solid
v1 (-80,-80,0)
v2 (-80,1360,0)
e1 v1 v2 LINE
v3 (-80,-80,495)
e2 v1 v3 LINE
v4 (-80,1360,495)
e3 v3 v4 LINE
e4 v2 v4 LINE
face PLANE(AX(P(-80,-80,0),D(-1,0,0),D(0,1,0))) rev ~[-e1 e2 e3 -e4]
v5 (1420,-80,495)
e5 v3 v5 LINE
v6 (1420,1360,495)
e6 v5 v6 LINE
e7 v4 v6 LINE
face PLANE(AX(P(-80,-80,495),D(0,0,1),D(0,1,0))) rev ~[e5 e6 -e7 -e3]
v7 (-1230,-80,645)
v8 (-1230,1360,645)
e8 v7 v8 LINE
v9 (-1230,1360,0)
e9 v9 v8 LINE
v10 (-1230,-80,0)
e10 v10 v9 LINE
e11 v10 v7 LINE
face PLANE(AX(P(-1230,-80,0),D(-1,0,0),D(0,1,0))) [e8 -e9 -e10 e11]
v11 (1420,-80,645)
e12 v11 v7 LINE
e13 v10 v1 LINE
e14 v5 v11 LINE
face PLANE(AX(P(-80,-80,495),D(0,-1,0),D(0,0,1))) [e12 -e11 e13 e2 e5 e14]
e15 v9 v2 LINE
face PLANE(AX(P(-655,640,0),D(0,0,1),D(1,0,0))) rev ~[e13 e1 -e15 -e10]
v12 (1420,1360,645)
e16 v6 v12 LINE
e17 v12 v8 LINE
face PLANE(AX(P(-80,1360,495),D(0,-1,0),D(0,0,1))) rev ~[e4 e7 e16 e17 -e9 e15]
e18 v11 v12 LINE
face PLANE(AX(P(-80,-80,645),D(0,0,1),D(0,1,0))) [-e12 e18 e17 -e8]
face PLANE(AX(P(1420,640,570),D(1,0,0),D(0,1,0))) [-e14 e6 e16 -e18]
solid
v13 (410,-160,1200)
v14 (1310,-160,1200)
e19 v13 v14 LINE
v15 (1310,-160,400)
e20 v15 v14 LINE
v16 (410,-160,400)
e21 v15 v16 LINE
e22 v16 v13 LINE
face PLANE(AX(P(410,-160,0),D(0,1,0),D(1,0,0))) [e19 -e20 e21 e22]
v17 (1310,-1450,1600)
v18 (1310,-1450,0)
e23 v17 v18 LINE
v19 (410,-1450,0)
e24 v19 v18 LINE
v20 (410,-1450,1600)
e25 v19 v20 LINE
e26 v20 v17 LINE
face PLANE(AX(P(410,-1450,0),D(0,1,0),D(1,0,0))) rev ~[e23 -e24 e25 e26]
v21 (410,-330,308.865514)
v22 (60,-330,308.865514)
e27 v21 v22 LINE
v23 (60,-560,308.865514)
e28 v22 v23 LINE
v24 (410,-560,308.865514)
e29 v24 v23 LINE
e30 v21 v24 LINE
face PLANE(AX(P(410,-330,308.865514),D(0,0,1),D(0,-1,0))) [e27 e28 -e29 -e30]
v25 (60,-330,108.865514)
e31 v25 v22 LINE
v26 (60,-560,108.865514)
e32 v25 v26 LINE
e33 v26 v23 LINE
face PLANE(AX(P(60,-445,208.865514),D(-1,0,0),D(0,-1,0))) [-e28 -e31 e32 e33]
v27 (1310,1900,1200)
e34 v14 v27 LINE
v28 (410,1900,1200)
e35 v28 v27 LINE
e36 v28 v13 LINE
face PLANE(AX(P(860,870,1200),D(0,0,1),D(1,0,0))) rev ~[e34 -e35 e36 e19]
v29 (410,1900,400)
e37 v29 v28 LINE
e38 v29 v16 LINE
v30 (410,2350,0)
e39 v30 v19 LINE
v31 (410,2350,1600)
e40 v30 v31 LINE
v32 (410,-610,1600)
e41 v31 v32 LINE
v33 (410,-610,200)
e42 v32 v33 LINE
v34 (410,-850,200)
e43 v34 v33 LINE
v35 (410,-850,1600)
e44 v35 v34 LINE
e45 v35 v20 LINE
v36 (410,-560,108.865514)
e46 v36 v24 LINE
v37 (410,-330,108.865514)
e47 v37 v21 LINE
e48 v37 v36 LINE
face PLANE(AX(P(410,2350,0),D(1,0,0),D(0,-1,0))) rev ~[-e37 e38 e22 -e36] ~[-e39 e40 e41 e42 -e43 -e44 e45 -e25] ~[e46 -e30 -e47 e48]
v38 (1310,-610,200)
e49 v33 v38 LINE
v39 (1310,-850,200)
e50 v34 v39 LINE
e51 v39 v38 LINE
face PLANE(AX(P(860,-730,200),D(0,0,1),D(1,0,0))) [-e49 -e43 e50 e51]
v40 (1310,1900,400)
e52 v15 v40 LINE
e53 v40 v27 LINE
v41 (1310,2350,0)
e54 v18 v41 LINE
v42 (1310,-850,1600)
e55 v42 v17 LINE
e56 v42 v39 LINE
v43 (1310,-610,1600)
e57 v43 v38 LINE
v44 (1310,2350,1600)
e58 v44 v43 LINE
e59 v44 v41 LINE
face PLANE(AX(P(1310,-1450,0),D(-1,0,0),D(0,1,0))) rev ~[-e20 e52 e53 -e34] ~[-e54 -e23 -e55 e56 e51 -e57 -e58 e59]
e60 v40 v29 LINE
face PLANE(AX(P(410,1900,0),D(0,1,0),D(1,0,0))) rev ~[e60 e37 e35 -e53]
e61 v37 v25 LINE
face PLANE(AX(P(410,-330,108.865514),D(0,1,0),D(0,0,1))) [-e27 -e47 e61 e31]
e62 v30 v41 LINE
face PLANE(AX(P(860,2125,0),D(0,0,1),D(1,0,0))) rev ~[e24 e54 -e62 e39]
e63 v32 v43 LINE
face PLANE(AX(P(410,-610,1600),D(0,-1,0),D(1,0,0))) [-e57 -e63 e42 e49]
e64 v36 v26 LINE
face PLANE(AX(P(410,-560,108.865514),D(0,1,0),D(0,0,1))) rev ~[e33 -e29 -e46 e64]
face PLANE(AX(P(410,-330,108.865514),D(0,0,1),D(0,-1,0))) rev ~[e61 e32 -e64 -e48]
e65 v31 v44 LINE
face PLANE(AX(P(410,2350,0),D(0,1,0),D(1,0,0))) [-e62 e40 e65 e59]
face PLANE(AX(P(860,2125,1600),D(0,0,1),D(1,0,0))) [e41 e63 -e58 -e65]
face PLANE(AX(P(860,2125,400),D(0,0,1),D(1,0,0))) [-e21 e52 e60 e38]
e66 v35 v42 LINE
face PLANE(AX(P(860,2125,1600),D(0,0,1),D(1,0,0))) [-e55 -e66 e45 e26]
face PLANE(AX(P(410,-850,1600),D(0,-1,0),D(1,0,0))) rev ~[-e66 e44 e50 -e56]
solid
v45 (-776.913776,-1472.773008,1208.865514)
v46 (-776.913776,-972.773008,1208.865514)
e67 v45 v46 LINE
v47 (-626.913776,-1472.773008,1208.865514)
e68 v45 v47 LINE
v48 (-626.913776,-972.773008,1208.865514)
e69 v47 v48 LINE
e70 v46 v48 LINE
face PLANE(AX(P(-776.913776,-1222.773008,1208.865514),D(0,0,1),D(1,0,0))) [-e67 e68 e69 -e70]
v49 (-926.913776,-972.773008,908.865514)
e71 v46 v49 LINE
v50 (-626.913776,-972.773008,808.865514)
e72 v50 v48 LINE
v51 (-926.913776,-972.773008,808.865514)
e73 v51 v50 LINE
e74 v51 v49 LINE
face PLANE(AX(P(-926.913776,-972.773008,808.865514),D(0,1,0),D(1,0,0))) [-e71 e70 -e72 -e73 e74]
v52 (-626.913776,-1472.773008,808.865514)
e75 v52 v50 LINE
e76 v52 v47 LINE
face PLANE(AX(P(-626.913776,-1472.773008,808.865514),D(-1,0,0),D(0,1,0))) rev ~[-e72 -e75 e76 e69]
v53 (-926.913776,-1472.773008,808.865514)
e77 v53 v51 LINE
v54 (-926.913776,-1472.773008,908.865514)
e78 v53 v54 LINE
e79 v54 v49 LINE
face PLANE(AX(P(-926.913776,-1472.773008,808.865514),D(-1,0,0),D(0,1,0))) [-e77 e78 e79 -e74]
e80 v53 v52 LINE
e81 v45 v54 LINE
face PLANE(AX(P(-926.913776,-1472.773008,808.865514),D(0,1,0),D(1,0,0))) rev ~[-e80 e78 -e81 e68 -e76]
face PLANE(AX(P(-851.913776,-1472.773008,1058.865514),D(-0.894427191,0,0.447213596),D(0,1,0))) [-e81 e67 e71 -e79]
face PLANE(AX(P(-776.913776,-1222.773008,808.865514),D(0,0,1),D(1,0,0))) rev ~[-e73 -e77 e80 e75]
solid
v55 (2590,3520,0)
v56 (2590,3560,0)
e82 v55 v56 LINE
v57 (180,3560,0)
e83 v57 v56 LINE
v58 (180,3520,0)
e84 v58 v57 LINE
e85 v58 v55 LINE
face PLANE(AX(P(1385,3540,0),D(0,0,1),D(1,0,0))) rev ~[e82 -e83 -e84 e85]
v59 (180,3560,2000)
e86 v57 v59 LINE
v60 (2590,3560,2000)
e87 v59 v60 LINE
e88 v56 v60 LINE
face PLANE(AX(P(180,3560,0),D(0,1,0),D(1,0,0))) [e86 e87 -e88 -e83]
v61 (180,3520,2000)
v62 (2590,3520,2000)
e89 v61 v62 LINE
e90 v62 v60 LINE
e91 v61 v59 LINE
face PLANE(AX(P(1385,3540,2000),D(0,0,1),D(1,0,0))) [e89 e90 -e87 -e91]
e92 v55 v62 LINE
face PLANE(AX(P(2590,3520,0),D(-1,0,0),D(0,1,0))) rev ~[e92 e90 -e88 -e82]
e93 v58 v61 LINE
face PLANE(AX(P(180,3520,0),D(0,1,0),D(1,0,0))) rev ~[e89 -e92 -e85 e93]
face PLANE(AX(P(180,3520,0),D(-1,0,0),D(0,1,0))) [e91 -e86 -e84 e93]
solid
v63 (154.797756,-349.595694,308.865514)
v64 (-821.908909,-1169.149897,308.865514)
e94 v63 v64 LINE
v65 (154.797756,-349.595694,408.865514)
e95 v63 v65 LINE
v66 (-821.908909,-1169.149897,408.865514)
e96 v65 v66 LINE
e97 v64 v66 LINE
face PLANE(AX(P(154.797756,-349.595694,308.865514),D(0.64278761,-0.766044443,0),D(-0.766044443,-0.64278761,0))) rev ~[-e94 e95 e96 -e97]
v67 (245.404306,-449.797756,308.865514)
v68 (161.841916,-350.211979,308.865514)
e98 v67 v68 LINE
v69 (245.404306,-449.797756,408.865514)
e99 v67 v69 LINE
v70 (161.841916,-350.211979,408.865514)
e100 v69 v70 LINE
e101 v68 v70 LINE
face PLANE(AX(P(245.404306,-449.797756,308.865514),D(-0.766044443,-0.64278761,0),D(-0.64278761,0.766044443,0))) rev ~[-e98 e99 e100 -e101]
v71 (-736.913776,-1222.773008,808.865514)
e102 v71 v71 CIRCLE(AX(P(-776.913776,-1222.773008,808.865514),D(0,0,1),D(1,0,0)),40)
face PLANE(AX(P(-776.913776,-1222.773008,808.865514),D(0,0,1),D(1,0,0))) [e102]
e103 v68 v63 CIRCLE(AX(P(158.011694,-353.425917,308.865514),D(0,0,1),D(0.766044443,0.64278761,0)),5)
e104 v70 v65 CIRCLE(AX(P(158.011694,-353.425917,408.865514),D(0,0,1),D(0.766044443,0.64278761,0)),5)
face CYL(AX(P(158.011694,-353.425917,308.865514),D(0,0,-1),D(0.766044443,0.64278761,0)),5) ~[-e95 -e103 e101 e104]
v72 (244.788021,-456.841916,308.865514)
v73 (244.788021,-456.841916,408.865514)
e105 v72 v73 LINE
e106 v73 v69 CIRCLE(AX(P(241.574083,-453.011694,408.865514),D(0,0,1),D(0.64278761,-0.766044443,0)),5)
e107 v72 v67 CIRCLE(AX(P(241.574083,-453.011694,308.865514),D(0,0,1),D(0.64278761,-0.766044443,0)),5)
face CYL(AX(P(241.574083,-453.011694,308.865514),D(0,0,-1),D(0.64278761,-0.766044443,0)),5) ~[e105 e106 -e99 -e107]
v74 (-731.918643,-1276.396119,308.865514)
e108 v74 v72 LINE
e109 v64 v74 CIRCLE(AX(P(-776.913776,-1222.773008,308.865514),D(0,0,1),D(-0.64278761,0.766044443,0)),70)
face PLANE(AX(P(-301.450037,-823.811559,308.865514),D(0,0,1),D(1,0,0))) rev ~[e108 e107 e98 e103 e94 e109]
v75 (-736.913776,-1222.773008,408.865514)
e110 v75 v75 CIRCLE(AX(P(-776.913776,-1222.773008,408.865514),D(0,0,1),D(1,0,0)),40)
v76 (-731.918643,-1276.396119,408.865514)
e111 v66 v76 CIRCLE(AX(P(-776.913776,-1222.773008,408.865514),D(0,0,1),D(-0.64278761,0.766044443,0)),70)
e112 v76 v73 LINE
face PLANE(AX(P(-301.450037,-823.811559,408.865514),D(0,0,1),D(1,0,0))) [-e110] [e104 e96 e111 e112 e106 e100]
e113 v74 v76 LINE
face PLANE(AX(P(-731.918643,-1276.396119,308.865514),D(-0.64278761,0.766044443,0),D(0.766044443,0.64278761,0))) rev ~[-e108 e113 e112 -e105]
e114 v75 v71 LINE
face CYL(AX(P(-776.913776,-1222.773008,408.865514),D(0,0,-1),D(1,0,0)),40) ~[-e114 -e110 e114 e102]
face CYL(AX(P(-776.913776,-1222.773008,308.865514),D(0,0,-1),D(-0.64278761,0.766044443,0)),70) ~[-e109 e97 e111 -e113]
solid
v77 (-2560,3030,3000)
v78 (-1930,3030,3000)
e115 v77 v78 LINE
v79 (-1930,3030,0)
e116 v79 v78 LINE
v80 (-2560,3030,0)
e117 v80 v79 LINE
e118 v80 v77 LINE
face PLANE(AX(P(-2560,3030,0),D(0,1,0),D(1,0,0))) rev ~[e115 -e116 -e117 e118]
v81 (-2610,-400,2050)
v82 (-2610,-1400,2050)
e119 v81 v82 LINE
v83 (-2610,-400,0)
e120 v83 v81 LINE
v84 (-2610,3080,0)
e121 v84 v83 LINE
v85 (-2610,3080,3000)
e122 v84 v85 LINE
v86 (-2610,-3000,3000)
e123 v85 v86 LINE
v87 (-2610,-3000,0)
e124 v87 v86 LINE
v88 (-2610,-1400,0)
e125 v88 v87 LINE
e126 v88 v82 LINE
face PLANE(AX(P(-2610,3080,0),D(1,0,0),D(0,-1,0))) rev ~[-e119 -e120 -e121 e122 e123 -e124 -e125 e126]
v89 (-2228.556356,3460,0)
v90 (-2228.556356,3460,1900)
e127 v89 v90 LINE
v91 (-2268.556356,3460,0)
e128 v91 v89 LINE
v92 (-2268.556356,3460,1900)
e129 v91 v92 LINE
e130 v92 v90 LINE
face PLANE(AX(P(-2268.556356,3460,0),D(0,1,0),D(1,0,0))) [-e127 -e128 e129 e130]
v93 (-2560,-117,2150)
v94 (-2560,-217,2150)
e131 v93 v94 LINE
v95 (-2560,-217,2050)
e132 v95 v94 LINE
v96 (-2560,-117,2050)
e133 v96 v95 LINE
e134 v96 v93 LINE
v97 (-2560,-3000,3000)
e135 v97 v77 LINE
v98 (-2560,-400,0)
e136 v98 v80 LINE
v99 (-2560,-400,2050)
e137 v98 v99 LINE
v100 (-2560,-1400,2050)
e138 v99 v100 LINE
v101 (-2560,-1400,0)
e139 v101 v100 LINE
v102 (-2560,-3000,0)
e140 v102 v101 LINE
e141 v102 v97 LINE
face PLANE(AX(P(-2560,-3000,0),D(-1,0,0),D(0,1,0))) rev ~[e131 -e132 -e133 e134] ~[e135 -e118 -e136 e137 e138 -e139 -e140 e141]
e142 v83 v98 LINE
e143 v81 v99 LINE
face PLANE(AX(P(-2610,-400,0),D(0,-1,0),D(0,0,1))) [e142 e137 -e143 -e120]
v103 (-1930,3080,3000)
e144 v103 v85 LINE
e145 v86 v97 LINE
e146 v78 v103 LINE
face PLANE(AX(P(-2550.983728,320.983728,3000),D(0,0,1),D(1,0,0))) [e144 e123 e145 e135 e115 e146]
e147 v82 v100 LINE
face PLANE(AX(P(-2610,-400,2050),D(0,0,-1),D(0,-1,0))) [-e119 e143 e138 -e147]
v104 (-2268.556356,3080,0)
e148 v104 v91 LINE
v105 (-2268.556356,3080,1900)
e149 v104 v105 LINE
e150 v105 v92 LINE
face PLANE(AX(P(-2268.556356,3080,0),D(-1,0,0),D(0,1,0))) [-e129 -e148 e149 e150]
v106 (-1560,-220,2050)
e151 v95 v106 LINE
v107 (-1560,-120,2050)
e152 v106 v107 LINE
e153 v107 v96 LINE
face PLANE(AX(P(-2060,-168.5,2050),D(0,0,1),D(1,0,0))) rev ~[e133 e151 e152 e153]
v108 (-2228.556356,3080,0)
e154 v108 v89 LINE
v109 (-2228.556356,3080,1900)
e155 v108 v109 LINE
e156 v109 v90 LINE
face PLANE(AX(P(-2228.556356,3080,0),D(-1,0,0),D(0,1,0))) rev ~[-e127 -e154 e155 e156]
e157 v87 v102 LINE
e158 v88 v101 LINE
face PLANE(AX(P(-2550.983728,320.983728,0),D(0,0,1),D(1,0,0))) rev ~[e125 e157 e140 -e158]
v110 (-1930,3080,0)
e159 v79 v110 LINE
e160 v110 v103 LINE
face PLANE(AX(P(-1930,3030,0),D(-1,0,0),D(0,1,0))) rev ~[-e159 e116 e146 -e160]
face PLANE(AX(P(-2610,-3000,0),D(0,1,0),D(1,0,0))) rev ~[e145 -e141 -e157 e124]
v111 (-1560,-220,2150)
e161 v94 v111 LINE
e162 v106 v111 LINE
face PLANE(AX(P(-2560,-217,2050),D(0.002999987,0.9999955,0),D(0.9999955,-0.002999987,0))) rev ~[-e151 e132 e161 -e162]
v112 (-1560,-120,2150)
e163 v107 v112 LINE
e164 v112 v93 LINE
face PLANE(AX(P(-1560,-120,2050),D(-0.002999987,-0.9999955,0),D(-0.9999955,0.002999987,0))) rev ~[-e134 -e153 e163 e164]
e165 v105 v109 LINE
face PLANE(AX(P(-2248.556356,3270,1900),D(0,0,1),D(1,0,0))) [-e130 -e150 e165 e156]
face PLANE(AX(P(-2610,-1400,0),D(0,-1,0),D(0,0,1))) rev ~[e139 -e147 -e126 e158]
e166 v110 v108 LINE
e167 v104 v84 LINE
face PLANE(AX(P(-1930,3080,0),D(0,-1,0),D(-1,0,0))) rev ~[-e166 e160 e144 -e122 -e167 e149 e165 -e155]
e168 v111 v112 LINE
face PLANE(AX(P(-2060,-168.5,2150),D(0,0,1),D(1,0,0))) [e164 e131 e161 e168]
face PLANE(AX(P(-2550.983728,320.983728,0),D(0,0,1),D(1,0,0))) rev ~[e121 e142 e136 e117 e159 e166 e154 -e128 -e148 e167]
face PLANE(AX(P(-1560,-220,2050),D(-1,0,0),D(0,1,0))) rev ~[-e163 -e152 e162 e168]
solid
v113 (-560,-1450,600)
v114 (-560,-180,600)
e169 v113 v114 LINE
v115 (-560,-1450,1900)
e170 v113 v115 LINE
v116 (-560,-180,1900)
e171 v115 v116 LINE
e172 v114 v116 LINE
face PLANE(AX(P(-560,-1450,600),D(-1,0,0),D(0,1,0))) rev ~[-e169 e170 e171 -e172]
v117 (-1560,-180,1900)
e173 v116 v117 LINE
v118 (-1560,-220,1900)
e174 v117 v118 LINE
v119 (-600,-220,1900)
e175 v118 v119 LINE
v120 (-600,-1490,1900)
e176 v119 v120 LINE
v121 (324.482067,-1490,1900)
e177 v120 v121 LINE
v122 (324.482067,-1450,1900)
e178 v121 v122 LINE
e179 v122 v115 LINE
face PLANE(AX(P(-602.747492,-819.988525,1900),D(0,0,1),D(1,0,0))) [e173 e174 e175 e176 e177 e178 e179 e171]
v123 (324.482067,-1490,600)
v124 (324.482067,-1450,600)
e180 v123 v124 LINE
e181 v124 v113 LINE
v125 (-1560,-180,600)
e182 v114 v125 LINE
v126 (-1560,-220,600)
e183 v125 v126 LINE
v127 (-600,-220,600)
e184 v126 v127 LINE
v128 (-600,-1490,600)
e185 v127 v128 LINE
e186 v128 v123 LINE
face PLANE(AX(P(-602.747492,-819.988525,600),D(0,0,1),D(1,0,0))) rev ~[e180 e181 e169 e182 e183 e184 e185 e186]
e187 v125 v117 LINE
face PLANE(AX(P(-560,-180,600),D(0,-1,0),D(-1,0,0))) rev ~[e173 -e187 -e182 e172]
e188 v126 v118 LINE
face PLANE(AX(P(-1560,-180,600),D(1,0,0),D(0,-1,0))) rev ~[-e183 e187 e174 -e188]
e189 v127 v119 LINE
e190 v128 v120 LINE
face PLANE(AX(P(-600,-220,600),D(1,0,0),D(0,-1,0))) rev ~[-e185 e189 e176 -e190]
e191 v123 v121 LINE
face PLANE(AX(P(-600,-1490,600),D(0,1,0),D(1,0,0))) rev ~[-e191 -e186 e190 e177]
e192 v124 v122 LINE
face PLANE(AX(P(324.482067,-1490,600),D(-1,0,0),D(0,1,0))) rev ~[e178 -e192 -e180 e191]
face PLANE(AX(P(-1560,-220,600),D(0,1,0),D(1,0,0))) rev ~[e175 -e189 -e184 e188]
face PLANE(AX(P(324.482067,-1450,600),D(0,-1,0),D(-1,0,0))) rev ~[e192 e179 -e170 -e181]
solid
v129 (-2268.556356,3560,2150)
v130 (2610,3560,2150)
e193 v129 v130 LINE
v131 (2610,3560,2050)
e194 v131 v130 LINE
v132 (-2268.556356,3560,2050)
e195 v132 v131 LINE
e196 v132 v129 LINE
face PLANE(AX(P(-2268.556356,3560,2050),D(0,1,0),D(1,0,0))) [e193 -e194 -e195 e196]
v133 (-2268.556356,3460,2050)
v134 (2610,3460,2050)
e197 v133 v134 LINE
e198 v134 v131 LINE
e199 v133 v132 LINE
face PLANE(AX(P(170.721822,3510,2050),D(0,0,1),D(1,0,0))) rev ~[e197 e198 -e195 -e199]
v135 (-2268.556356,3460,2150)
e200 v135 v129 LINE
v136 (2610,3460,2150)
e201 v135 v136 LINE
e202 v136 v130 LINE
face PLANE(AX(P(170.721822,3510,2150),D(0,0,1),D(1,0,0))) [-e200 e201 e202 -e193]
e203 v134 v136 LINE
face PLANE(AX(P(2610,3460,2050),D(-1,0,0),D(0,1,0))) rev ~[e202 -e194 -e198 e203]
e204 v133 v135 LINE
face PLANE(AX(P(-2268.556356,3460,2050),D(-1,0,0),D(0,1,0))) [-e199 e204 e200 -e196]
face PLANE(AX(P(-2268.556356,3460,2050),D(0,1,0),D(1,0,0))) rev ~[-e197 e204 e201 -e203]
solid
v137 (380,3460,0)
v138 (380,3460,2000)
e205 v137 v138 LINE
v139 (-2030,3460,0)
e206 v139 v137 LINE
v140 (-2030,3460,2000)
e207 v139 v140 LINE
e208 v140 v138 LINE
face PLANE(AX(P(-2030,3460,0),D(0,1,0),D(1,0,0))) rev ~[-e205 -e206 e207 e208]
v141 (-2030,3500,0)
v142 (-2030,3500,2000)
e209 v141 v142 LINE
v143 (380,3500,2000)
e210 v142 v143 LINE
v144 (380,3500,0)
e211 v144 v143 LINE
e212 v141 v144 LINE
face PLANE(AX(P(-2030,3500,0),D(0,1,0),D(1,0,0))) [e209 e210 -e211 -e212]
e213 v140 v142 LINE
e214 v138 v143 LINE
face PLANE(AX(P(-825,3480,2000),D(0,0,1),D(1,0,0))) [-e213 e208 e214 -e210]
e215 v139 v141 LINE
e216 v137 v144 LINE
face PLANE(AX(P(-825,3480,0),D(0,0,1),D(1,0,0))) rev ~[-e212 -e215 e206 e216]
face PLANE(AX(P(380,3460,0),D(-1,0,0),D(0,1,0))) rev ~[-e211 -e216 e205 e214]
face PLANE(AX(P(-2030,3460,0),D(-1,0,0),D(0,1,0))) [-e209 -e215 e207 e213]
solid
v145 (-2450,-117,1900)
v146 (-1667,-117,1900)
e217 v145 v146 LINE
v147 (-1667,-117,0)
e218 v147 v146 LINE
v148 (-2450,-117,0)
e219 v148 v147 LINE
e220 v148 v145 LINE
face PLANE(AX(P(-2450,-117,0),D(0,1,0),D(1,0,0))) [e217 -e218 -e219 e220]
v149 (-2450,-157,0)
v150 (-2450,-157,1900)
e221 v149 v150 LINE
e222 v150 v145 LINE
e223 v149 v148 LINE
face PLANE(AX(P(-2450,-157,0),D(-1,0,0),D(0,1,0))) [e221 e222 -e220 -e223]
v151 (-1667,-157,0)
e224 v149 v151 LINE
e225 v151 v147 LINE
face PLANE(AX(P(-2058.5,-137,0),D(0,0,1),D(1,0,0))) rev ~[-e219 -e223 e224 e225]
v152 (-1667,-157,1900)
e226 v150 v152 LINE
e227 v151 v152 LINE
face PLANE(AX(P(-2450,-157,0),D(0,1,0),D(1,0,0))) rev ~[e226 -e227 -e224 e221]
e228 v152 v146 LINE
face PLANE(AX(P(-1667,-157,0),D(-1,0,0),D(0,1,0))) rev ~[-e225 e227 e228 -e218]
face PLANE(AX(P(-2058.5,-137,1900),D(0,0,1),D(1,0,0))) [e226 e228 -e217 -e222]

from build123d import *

# Parameters (mm, degrees)
F1_DEPTH  = 3000
F0_W      = 1150
F0_H      = 1440
F2_DEPTH  = 645
F0_W_2    = 900
F0_H_2    = 450
F0_W_3    = 660
F0_H_3    = 1290
F3_DEPTH  = 400
F4_DEPTH  = 1600
F5_W      = 900
F5_H      = 2960
F5_H_2    = 240
F5_H_3    = 600
F6_DEPTH  = 400
F7_W      = 1440
F7_H      = 150
F8_DEPTH  = 1500
F9_DEPTH  = 1400
F10_W     = 1000
F10_H     = 2050
F11_DEPTH = 50
F12_W     = 230
F12_H     = 200
F13_DEPTH = 350
F15_DEPTH = 100
F16_R     = 40
F17_DEPTH = 400
F18_W     = 300
F18_H     = 500
F19_DEPTH = 400
F20_SIZE2 = 300
F20_SIZE  = 150
F23_DEPTH = 1300
F24_W     = 2410
F24_H     = 40
F26_DEPTH = 2000
F29_DEPTH = 100
F28_W     = 4878.5563564301
F28_H     = 100
F24_W_2   = 40
F24_H_2   = 380
F30_DEPTH = 1900
F24_W_3   = 783


# Not quite as in the source:
# - the program builds the solid bodies; features that only make, move or delete a surface that nothing else refers to are left out


with BuildPart() as f1:
    # F0 (on Top) → F1 (new body)
    with BuildSketch(Plane.XY):
        Polygon((-2610, -3000), (-2560, -3000), (-2560, 3030), (-1930, 3030), (-1930, 3080), (-2610, 3080), (-2610, 3030), align=None)
    extrude(amount=F1_DEPTH)

    # F10 (on face) → F11 (cut, through all)
    with BuildSketch(Plane(origin=(-2610, 0, 0), x_dir=(0, -1, 0), z_dir=(-1, 0, 0))):
        with Locations((900, 1025)):
            Rectangle(F10_W, F10_H)
    extrude(amount=-F11_DEPTH, mode=Mode.SUBTRACT)

    # F28 (on offset) → F29 (join)
    with BuildSketch(Plane.XY.offset(2050)):
        Polygon((-1560, -220), (-1560, -120), (-2560, -117), (-2560, -217), align=None)
    extrude(amount=F29_DEPTH)

    # F24 (on Top) → F30 (join)
    with BuildSketch(Plane.XY):
        with Locations((-2248.5563564301, 3270)):
            Rectangle(F24_W_2, F24_H_2)
    extrude(amount=F30_DEPTH)


with BuildPart() as f2:
    # F0 (on Top) → F2 (new body)
    with BuildSketch(Plane.XY):
        with Locations((-655, 640)):
            Rectangle(F0_W, F0_H)
    extrude(amount=F2_DEPTH)

    # F7 (on face) → F8 (join)
    with BuildSketch(Plane.YZ.offset(-80)):
        with Locations((640, 570)):
            Rectangle(F7_W, F7_H)
    extrude(amount=F8_DEPTH)


with BuildPart() as f3:
    # F0 (on Top) → F3 (new body)
    with BuildSketch(Plane.XY):
        with Locations((860, 2125)):
            Rectangle(F0_W_2, F0_H_2)
        Polygon((1070, -80), (410, -80), (410, -160), (1310, -160), (1310, 1900), (410, 1900), (410, 1360), (1070, 1360), align=None)
        with Locations((740, 640)):
            Rectangle(F0_W_3, F0_H)
        with Locations((860, -805)):
            Rectangle(F0_W_2, F0_H_3)
    extrude(amount=F3_DEPTH)

    # F0 (on Top) → F4 (join)
    with BuildSketch(Plane.XY):
        with Locations((860, 2125)):
            Rectangle(F0_W_2, F0_H_2)
        with Locations((860, -805)):
            Rectangle(F0_W_2, F0_H_3)
    extrude(amount=F4_DEPTH)

    # F5 (on face) → F6 (join)
    with BuildSketch(Plane.XY.offset(1600)):
        with Locations((860, 870)):
            Rectangle(F5_W, F5_H)
        with Locations((860, -730)):
            Rectangle(F5_W, F5_H_2)
        with Locations((860, -1150)):
            Rectangle(F5_W, F5_H_3)
    extrude(amount=-F6_DEPTH)

    # F5 (on face) → F9 (cut)
    with BuildSketch(Plane.XY.offset(1600)):
        with Locations((860, -730)):
            Rectangle(F5_W, F5_H_2)
    extrude(amount=-F9_DEPTH, mode=Mode.SUBTRACT)

    # F12 (on face) → F13 (join)
    with BuildSketch(Plane(origin=(410, 0, 0), x_dir=(0, -1, 0), z_dir=(-1, 0, 0))):
        with Locations((445, 208.8655143976)):
            Rectangle(F12_W, F12_H)
    extrude(amount=F13_DEPTH)


with BuildPart() as f15:
    # F14 (on face) → F15 (new body)
    with BuildSketch(Plane.XY.offset(308.8655143976)):
        with BuildLine():
            Line((245.404305648, -449.7977561247), (161.8419163887, -350.2119785192))
            ThreePointArc((161.8419163887, -350.2119785192), (158.4474728868, -348.4449430772), (154.7977561247, -349.595694352))
            Line((154.7977561247, -349.595694352), (-821.908908852, -1169.1498967024))
            ThreePointArc((-821.908908852, -1169.1498967024), (-830.5368871923, -1267.7681403988), (-731.9186434959, -1276.396118739))
            Line((-731.9186434959, -1276.396118739), (244.7880214808, -456.8419163887))
            ThreePointArc((244.7880214808, -456.8419163887), (246.5550569228, -453.4474728868), (245.404305648, -449.7977561247))
        make_face()
    extrude(amount=F15_DEPTH)

    # F16 (on face) → F17 (join)
    with BuildSketch(Plane.XY.offset(408.8655143976)):
        with Locations((-776.913776174, -1222.7730077207)):
            Circle(F16_R)
    extrude(amount=F17_DEPTH)


with BuildPart() as f19:
    # F18 (on face) → F19 (new body)
    with BuildSketch(Plane.XY.offset(808.8655143976)):
        with Locations((-776.913776174, -1222.7730077207)):
            Rectangle(F18_W, F18_H)
    extrude(amount=F19_DEPTH)

    # F20
    f20_edges = [f19.edges().sort_by_distance(p)[0] for p in [
        (-926.913776, -1222.773008, 1208.865514),
    ]]
    f20_side = f19.faces().sort_by_distance((-776.913776, -1222.773008, 1208.865514))[0]
    chamfer(f20_edges, length=F20_SIZE, length2=F20_SIZE2, reference=f20_side)


with BuildPart() as f23:
    # F22 (on offset) → F23 (new body)
    with BuildSketch(Plane.XY.offset(600)):
        Polygon((324.4820666313, -1490), (324.4820666313, -1450), (-560, -1450), (-560, -180), (-1560, -180), (-1560, -220), (-600, -220), (-600, -1490), align=None)
    extrude(amount=F23_DEPTH)


with BuildPart() as f26:
    # F24 (on Top) → F26 (new body)
    with BuildSketch(Plane.XY):
        with Locations((-825, 3480)):
            Rectangle(F24_W, F24_H)
    extrude(amount=F26_DEPTH)


with BuildPart() as f26b:
    # F24 (on Top) → F26, piece 2 (new body)
    with BuildSketch(Plane.XY):
        with Locations((1385, 3540)):
            Rectangle(F24_W, F24_H)
    extrude(amount=F26_DEPTH)


with BuildPart() as f29:
    # F28 (on offset) → F29, piece 2 (new body)
    with BuildSketch(Plane.XY.offset(2050)):
        with Locations((170.721821785, 3510)):
            Rectangle(F28_W, F28_H)
    extrude(amount=F29_DEPTH)


with BuildPart() as f30:
    # F24 (on Top) → F30, piece 2 (new body)
    with BuildSketch(Plane.XY):
        with Locations((-2058.5, -137)):
            Rectangle(F24_W_3, F24_H)
    extrude(amount=F30_DEPTH)


solid = Compound([f1.part, f2.part, f3.part, f15.part, f19.part, f23.part, f26.part, f26b.part, f29.part, f30.part])
